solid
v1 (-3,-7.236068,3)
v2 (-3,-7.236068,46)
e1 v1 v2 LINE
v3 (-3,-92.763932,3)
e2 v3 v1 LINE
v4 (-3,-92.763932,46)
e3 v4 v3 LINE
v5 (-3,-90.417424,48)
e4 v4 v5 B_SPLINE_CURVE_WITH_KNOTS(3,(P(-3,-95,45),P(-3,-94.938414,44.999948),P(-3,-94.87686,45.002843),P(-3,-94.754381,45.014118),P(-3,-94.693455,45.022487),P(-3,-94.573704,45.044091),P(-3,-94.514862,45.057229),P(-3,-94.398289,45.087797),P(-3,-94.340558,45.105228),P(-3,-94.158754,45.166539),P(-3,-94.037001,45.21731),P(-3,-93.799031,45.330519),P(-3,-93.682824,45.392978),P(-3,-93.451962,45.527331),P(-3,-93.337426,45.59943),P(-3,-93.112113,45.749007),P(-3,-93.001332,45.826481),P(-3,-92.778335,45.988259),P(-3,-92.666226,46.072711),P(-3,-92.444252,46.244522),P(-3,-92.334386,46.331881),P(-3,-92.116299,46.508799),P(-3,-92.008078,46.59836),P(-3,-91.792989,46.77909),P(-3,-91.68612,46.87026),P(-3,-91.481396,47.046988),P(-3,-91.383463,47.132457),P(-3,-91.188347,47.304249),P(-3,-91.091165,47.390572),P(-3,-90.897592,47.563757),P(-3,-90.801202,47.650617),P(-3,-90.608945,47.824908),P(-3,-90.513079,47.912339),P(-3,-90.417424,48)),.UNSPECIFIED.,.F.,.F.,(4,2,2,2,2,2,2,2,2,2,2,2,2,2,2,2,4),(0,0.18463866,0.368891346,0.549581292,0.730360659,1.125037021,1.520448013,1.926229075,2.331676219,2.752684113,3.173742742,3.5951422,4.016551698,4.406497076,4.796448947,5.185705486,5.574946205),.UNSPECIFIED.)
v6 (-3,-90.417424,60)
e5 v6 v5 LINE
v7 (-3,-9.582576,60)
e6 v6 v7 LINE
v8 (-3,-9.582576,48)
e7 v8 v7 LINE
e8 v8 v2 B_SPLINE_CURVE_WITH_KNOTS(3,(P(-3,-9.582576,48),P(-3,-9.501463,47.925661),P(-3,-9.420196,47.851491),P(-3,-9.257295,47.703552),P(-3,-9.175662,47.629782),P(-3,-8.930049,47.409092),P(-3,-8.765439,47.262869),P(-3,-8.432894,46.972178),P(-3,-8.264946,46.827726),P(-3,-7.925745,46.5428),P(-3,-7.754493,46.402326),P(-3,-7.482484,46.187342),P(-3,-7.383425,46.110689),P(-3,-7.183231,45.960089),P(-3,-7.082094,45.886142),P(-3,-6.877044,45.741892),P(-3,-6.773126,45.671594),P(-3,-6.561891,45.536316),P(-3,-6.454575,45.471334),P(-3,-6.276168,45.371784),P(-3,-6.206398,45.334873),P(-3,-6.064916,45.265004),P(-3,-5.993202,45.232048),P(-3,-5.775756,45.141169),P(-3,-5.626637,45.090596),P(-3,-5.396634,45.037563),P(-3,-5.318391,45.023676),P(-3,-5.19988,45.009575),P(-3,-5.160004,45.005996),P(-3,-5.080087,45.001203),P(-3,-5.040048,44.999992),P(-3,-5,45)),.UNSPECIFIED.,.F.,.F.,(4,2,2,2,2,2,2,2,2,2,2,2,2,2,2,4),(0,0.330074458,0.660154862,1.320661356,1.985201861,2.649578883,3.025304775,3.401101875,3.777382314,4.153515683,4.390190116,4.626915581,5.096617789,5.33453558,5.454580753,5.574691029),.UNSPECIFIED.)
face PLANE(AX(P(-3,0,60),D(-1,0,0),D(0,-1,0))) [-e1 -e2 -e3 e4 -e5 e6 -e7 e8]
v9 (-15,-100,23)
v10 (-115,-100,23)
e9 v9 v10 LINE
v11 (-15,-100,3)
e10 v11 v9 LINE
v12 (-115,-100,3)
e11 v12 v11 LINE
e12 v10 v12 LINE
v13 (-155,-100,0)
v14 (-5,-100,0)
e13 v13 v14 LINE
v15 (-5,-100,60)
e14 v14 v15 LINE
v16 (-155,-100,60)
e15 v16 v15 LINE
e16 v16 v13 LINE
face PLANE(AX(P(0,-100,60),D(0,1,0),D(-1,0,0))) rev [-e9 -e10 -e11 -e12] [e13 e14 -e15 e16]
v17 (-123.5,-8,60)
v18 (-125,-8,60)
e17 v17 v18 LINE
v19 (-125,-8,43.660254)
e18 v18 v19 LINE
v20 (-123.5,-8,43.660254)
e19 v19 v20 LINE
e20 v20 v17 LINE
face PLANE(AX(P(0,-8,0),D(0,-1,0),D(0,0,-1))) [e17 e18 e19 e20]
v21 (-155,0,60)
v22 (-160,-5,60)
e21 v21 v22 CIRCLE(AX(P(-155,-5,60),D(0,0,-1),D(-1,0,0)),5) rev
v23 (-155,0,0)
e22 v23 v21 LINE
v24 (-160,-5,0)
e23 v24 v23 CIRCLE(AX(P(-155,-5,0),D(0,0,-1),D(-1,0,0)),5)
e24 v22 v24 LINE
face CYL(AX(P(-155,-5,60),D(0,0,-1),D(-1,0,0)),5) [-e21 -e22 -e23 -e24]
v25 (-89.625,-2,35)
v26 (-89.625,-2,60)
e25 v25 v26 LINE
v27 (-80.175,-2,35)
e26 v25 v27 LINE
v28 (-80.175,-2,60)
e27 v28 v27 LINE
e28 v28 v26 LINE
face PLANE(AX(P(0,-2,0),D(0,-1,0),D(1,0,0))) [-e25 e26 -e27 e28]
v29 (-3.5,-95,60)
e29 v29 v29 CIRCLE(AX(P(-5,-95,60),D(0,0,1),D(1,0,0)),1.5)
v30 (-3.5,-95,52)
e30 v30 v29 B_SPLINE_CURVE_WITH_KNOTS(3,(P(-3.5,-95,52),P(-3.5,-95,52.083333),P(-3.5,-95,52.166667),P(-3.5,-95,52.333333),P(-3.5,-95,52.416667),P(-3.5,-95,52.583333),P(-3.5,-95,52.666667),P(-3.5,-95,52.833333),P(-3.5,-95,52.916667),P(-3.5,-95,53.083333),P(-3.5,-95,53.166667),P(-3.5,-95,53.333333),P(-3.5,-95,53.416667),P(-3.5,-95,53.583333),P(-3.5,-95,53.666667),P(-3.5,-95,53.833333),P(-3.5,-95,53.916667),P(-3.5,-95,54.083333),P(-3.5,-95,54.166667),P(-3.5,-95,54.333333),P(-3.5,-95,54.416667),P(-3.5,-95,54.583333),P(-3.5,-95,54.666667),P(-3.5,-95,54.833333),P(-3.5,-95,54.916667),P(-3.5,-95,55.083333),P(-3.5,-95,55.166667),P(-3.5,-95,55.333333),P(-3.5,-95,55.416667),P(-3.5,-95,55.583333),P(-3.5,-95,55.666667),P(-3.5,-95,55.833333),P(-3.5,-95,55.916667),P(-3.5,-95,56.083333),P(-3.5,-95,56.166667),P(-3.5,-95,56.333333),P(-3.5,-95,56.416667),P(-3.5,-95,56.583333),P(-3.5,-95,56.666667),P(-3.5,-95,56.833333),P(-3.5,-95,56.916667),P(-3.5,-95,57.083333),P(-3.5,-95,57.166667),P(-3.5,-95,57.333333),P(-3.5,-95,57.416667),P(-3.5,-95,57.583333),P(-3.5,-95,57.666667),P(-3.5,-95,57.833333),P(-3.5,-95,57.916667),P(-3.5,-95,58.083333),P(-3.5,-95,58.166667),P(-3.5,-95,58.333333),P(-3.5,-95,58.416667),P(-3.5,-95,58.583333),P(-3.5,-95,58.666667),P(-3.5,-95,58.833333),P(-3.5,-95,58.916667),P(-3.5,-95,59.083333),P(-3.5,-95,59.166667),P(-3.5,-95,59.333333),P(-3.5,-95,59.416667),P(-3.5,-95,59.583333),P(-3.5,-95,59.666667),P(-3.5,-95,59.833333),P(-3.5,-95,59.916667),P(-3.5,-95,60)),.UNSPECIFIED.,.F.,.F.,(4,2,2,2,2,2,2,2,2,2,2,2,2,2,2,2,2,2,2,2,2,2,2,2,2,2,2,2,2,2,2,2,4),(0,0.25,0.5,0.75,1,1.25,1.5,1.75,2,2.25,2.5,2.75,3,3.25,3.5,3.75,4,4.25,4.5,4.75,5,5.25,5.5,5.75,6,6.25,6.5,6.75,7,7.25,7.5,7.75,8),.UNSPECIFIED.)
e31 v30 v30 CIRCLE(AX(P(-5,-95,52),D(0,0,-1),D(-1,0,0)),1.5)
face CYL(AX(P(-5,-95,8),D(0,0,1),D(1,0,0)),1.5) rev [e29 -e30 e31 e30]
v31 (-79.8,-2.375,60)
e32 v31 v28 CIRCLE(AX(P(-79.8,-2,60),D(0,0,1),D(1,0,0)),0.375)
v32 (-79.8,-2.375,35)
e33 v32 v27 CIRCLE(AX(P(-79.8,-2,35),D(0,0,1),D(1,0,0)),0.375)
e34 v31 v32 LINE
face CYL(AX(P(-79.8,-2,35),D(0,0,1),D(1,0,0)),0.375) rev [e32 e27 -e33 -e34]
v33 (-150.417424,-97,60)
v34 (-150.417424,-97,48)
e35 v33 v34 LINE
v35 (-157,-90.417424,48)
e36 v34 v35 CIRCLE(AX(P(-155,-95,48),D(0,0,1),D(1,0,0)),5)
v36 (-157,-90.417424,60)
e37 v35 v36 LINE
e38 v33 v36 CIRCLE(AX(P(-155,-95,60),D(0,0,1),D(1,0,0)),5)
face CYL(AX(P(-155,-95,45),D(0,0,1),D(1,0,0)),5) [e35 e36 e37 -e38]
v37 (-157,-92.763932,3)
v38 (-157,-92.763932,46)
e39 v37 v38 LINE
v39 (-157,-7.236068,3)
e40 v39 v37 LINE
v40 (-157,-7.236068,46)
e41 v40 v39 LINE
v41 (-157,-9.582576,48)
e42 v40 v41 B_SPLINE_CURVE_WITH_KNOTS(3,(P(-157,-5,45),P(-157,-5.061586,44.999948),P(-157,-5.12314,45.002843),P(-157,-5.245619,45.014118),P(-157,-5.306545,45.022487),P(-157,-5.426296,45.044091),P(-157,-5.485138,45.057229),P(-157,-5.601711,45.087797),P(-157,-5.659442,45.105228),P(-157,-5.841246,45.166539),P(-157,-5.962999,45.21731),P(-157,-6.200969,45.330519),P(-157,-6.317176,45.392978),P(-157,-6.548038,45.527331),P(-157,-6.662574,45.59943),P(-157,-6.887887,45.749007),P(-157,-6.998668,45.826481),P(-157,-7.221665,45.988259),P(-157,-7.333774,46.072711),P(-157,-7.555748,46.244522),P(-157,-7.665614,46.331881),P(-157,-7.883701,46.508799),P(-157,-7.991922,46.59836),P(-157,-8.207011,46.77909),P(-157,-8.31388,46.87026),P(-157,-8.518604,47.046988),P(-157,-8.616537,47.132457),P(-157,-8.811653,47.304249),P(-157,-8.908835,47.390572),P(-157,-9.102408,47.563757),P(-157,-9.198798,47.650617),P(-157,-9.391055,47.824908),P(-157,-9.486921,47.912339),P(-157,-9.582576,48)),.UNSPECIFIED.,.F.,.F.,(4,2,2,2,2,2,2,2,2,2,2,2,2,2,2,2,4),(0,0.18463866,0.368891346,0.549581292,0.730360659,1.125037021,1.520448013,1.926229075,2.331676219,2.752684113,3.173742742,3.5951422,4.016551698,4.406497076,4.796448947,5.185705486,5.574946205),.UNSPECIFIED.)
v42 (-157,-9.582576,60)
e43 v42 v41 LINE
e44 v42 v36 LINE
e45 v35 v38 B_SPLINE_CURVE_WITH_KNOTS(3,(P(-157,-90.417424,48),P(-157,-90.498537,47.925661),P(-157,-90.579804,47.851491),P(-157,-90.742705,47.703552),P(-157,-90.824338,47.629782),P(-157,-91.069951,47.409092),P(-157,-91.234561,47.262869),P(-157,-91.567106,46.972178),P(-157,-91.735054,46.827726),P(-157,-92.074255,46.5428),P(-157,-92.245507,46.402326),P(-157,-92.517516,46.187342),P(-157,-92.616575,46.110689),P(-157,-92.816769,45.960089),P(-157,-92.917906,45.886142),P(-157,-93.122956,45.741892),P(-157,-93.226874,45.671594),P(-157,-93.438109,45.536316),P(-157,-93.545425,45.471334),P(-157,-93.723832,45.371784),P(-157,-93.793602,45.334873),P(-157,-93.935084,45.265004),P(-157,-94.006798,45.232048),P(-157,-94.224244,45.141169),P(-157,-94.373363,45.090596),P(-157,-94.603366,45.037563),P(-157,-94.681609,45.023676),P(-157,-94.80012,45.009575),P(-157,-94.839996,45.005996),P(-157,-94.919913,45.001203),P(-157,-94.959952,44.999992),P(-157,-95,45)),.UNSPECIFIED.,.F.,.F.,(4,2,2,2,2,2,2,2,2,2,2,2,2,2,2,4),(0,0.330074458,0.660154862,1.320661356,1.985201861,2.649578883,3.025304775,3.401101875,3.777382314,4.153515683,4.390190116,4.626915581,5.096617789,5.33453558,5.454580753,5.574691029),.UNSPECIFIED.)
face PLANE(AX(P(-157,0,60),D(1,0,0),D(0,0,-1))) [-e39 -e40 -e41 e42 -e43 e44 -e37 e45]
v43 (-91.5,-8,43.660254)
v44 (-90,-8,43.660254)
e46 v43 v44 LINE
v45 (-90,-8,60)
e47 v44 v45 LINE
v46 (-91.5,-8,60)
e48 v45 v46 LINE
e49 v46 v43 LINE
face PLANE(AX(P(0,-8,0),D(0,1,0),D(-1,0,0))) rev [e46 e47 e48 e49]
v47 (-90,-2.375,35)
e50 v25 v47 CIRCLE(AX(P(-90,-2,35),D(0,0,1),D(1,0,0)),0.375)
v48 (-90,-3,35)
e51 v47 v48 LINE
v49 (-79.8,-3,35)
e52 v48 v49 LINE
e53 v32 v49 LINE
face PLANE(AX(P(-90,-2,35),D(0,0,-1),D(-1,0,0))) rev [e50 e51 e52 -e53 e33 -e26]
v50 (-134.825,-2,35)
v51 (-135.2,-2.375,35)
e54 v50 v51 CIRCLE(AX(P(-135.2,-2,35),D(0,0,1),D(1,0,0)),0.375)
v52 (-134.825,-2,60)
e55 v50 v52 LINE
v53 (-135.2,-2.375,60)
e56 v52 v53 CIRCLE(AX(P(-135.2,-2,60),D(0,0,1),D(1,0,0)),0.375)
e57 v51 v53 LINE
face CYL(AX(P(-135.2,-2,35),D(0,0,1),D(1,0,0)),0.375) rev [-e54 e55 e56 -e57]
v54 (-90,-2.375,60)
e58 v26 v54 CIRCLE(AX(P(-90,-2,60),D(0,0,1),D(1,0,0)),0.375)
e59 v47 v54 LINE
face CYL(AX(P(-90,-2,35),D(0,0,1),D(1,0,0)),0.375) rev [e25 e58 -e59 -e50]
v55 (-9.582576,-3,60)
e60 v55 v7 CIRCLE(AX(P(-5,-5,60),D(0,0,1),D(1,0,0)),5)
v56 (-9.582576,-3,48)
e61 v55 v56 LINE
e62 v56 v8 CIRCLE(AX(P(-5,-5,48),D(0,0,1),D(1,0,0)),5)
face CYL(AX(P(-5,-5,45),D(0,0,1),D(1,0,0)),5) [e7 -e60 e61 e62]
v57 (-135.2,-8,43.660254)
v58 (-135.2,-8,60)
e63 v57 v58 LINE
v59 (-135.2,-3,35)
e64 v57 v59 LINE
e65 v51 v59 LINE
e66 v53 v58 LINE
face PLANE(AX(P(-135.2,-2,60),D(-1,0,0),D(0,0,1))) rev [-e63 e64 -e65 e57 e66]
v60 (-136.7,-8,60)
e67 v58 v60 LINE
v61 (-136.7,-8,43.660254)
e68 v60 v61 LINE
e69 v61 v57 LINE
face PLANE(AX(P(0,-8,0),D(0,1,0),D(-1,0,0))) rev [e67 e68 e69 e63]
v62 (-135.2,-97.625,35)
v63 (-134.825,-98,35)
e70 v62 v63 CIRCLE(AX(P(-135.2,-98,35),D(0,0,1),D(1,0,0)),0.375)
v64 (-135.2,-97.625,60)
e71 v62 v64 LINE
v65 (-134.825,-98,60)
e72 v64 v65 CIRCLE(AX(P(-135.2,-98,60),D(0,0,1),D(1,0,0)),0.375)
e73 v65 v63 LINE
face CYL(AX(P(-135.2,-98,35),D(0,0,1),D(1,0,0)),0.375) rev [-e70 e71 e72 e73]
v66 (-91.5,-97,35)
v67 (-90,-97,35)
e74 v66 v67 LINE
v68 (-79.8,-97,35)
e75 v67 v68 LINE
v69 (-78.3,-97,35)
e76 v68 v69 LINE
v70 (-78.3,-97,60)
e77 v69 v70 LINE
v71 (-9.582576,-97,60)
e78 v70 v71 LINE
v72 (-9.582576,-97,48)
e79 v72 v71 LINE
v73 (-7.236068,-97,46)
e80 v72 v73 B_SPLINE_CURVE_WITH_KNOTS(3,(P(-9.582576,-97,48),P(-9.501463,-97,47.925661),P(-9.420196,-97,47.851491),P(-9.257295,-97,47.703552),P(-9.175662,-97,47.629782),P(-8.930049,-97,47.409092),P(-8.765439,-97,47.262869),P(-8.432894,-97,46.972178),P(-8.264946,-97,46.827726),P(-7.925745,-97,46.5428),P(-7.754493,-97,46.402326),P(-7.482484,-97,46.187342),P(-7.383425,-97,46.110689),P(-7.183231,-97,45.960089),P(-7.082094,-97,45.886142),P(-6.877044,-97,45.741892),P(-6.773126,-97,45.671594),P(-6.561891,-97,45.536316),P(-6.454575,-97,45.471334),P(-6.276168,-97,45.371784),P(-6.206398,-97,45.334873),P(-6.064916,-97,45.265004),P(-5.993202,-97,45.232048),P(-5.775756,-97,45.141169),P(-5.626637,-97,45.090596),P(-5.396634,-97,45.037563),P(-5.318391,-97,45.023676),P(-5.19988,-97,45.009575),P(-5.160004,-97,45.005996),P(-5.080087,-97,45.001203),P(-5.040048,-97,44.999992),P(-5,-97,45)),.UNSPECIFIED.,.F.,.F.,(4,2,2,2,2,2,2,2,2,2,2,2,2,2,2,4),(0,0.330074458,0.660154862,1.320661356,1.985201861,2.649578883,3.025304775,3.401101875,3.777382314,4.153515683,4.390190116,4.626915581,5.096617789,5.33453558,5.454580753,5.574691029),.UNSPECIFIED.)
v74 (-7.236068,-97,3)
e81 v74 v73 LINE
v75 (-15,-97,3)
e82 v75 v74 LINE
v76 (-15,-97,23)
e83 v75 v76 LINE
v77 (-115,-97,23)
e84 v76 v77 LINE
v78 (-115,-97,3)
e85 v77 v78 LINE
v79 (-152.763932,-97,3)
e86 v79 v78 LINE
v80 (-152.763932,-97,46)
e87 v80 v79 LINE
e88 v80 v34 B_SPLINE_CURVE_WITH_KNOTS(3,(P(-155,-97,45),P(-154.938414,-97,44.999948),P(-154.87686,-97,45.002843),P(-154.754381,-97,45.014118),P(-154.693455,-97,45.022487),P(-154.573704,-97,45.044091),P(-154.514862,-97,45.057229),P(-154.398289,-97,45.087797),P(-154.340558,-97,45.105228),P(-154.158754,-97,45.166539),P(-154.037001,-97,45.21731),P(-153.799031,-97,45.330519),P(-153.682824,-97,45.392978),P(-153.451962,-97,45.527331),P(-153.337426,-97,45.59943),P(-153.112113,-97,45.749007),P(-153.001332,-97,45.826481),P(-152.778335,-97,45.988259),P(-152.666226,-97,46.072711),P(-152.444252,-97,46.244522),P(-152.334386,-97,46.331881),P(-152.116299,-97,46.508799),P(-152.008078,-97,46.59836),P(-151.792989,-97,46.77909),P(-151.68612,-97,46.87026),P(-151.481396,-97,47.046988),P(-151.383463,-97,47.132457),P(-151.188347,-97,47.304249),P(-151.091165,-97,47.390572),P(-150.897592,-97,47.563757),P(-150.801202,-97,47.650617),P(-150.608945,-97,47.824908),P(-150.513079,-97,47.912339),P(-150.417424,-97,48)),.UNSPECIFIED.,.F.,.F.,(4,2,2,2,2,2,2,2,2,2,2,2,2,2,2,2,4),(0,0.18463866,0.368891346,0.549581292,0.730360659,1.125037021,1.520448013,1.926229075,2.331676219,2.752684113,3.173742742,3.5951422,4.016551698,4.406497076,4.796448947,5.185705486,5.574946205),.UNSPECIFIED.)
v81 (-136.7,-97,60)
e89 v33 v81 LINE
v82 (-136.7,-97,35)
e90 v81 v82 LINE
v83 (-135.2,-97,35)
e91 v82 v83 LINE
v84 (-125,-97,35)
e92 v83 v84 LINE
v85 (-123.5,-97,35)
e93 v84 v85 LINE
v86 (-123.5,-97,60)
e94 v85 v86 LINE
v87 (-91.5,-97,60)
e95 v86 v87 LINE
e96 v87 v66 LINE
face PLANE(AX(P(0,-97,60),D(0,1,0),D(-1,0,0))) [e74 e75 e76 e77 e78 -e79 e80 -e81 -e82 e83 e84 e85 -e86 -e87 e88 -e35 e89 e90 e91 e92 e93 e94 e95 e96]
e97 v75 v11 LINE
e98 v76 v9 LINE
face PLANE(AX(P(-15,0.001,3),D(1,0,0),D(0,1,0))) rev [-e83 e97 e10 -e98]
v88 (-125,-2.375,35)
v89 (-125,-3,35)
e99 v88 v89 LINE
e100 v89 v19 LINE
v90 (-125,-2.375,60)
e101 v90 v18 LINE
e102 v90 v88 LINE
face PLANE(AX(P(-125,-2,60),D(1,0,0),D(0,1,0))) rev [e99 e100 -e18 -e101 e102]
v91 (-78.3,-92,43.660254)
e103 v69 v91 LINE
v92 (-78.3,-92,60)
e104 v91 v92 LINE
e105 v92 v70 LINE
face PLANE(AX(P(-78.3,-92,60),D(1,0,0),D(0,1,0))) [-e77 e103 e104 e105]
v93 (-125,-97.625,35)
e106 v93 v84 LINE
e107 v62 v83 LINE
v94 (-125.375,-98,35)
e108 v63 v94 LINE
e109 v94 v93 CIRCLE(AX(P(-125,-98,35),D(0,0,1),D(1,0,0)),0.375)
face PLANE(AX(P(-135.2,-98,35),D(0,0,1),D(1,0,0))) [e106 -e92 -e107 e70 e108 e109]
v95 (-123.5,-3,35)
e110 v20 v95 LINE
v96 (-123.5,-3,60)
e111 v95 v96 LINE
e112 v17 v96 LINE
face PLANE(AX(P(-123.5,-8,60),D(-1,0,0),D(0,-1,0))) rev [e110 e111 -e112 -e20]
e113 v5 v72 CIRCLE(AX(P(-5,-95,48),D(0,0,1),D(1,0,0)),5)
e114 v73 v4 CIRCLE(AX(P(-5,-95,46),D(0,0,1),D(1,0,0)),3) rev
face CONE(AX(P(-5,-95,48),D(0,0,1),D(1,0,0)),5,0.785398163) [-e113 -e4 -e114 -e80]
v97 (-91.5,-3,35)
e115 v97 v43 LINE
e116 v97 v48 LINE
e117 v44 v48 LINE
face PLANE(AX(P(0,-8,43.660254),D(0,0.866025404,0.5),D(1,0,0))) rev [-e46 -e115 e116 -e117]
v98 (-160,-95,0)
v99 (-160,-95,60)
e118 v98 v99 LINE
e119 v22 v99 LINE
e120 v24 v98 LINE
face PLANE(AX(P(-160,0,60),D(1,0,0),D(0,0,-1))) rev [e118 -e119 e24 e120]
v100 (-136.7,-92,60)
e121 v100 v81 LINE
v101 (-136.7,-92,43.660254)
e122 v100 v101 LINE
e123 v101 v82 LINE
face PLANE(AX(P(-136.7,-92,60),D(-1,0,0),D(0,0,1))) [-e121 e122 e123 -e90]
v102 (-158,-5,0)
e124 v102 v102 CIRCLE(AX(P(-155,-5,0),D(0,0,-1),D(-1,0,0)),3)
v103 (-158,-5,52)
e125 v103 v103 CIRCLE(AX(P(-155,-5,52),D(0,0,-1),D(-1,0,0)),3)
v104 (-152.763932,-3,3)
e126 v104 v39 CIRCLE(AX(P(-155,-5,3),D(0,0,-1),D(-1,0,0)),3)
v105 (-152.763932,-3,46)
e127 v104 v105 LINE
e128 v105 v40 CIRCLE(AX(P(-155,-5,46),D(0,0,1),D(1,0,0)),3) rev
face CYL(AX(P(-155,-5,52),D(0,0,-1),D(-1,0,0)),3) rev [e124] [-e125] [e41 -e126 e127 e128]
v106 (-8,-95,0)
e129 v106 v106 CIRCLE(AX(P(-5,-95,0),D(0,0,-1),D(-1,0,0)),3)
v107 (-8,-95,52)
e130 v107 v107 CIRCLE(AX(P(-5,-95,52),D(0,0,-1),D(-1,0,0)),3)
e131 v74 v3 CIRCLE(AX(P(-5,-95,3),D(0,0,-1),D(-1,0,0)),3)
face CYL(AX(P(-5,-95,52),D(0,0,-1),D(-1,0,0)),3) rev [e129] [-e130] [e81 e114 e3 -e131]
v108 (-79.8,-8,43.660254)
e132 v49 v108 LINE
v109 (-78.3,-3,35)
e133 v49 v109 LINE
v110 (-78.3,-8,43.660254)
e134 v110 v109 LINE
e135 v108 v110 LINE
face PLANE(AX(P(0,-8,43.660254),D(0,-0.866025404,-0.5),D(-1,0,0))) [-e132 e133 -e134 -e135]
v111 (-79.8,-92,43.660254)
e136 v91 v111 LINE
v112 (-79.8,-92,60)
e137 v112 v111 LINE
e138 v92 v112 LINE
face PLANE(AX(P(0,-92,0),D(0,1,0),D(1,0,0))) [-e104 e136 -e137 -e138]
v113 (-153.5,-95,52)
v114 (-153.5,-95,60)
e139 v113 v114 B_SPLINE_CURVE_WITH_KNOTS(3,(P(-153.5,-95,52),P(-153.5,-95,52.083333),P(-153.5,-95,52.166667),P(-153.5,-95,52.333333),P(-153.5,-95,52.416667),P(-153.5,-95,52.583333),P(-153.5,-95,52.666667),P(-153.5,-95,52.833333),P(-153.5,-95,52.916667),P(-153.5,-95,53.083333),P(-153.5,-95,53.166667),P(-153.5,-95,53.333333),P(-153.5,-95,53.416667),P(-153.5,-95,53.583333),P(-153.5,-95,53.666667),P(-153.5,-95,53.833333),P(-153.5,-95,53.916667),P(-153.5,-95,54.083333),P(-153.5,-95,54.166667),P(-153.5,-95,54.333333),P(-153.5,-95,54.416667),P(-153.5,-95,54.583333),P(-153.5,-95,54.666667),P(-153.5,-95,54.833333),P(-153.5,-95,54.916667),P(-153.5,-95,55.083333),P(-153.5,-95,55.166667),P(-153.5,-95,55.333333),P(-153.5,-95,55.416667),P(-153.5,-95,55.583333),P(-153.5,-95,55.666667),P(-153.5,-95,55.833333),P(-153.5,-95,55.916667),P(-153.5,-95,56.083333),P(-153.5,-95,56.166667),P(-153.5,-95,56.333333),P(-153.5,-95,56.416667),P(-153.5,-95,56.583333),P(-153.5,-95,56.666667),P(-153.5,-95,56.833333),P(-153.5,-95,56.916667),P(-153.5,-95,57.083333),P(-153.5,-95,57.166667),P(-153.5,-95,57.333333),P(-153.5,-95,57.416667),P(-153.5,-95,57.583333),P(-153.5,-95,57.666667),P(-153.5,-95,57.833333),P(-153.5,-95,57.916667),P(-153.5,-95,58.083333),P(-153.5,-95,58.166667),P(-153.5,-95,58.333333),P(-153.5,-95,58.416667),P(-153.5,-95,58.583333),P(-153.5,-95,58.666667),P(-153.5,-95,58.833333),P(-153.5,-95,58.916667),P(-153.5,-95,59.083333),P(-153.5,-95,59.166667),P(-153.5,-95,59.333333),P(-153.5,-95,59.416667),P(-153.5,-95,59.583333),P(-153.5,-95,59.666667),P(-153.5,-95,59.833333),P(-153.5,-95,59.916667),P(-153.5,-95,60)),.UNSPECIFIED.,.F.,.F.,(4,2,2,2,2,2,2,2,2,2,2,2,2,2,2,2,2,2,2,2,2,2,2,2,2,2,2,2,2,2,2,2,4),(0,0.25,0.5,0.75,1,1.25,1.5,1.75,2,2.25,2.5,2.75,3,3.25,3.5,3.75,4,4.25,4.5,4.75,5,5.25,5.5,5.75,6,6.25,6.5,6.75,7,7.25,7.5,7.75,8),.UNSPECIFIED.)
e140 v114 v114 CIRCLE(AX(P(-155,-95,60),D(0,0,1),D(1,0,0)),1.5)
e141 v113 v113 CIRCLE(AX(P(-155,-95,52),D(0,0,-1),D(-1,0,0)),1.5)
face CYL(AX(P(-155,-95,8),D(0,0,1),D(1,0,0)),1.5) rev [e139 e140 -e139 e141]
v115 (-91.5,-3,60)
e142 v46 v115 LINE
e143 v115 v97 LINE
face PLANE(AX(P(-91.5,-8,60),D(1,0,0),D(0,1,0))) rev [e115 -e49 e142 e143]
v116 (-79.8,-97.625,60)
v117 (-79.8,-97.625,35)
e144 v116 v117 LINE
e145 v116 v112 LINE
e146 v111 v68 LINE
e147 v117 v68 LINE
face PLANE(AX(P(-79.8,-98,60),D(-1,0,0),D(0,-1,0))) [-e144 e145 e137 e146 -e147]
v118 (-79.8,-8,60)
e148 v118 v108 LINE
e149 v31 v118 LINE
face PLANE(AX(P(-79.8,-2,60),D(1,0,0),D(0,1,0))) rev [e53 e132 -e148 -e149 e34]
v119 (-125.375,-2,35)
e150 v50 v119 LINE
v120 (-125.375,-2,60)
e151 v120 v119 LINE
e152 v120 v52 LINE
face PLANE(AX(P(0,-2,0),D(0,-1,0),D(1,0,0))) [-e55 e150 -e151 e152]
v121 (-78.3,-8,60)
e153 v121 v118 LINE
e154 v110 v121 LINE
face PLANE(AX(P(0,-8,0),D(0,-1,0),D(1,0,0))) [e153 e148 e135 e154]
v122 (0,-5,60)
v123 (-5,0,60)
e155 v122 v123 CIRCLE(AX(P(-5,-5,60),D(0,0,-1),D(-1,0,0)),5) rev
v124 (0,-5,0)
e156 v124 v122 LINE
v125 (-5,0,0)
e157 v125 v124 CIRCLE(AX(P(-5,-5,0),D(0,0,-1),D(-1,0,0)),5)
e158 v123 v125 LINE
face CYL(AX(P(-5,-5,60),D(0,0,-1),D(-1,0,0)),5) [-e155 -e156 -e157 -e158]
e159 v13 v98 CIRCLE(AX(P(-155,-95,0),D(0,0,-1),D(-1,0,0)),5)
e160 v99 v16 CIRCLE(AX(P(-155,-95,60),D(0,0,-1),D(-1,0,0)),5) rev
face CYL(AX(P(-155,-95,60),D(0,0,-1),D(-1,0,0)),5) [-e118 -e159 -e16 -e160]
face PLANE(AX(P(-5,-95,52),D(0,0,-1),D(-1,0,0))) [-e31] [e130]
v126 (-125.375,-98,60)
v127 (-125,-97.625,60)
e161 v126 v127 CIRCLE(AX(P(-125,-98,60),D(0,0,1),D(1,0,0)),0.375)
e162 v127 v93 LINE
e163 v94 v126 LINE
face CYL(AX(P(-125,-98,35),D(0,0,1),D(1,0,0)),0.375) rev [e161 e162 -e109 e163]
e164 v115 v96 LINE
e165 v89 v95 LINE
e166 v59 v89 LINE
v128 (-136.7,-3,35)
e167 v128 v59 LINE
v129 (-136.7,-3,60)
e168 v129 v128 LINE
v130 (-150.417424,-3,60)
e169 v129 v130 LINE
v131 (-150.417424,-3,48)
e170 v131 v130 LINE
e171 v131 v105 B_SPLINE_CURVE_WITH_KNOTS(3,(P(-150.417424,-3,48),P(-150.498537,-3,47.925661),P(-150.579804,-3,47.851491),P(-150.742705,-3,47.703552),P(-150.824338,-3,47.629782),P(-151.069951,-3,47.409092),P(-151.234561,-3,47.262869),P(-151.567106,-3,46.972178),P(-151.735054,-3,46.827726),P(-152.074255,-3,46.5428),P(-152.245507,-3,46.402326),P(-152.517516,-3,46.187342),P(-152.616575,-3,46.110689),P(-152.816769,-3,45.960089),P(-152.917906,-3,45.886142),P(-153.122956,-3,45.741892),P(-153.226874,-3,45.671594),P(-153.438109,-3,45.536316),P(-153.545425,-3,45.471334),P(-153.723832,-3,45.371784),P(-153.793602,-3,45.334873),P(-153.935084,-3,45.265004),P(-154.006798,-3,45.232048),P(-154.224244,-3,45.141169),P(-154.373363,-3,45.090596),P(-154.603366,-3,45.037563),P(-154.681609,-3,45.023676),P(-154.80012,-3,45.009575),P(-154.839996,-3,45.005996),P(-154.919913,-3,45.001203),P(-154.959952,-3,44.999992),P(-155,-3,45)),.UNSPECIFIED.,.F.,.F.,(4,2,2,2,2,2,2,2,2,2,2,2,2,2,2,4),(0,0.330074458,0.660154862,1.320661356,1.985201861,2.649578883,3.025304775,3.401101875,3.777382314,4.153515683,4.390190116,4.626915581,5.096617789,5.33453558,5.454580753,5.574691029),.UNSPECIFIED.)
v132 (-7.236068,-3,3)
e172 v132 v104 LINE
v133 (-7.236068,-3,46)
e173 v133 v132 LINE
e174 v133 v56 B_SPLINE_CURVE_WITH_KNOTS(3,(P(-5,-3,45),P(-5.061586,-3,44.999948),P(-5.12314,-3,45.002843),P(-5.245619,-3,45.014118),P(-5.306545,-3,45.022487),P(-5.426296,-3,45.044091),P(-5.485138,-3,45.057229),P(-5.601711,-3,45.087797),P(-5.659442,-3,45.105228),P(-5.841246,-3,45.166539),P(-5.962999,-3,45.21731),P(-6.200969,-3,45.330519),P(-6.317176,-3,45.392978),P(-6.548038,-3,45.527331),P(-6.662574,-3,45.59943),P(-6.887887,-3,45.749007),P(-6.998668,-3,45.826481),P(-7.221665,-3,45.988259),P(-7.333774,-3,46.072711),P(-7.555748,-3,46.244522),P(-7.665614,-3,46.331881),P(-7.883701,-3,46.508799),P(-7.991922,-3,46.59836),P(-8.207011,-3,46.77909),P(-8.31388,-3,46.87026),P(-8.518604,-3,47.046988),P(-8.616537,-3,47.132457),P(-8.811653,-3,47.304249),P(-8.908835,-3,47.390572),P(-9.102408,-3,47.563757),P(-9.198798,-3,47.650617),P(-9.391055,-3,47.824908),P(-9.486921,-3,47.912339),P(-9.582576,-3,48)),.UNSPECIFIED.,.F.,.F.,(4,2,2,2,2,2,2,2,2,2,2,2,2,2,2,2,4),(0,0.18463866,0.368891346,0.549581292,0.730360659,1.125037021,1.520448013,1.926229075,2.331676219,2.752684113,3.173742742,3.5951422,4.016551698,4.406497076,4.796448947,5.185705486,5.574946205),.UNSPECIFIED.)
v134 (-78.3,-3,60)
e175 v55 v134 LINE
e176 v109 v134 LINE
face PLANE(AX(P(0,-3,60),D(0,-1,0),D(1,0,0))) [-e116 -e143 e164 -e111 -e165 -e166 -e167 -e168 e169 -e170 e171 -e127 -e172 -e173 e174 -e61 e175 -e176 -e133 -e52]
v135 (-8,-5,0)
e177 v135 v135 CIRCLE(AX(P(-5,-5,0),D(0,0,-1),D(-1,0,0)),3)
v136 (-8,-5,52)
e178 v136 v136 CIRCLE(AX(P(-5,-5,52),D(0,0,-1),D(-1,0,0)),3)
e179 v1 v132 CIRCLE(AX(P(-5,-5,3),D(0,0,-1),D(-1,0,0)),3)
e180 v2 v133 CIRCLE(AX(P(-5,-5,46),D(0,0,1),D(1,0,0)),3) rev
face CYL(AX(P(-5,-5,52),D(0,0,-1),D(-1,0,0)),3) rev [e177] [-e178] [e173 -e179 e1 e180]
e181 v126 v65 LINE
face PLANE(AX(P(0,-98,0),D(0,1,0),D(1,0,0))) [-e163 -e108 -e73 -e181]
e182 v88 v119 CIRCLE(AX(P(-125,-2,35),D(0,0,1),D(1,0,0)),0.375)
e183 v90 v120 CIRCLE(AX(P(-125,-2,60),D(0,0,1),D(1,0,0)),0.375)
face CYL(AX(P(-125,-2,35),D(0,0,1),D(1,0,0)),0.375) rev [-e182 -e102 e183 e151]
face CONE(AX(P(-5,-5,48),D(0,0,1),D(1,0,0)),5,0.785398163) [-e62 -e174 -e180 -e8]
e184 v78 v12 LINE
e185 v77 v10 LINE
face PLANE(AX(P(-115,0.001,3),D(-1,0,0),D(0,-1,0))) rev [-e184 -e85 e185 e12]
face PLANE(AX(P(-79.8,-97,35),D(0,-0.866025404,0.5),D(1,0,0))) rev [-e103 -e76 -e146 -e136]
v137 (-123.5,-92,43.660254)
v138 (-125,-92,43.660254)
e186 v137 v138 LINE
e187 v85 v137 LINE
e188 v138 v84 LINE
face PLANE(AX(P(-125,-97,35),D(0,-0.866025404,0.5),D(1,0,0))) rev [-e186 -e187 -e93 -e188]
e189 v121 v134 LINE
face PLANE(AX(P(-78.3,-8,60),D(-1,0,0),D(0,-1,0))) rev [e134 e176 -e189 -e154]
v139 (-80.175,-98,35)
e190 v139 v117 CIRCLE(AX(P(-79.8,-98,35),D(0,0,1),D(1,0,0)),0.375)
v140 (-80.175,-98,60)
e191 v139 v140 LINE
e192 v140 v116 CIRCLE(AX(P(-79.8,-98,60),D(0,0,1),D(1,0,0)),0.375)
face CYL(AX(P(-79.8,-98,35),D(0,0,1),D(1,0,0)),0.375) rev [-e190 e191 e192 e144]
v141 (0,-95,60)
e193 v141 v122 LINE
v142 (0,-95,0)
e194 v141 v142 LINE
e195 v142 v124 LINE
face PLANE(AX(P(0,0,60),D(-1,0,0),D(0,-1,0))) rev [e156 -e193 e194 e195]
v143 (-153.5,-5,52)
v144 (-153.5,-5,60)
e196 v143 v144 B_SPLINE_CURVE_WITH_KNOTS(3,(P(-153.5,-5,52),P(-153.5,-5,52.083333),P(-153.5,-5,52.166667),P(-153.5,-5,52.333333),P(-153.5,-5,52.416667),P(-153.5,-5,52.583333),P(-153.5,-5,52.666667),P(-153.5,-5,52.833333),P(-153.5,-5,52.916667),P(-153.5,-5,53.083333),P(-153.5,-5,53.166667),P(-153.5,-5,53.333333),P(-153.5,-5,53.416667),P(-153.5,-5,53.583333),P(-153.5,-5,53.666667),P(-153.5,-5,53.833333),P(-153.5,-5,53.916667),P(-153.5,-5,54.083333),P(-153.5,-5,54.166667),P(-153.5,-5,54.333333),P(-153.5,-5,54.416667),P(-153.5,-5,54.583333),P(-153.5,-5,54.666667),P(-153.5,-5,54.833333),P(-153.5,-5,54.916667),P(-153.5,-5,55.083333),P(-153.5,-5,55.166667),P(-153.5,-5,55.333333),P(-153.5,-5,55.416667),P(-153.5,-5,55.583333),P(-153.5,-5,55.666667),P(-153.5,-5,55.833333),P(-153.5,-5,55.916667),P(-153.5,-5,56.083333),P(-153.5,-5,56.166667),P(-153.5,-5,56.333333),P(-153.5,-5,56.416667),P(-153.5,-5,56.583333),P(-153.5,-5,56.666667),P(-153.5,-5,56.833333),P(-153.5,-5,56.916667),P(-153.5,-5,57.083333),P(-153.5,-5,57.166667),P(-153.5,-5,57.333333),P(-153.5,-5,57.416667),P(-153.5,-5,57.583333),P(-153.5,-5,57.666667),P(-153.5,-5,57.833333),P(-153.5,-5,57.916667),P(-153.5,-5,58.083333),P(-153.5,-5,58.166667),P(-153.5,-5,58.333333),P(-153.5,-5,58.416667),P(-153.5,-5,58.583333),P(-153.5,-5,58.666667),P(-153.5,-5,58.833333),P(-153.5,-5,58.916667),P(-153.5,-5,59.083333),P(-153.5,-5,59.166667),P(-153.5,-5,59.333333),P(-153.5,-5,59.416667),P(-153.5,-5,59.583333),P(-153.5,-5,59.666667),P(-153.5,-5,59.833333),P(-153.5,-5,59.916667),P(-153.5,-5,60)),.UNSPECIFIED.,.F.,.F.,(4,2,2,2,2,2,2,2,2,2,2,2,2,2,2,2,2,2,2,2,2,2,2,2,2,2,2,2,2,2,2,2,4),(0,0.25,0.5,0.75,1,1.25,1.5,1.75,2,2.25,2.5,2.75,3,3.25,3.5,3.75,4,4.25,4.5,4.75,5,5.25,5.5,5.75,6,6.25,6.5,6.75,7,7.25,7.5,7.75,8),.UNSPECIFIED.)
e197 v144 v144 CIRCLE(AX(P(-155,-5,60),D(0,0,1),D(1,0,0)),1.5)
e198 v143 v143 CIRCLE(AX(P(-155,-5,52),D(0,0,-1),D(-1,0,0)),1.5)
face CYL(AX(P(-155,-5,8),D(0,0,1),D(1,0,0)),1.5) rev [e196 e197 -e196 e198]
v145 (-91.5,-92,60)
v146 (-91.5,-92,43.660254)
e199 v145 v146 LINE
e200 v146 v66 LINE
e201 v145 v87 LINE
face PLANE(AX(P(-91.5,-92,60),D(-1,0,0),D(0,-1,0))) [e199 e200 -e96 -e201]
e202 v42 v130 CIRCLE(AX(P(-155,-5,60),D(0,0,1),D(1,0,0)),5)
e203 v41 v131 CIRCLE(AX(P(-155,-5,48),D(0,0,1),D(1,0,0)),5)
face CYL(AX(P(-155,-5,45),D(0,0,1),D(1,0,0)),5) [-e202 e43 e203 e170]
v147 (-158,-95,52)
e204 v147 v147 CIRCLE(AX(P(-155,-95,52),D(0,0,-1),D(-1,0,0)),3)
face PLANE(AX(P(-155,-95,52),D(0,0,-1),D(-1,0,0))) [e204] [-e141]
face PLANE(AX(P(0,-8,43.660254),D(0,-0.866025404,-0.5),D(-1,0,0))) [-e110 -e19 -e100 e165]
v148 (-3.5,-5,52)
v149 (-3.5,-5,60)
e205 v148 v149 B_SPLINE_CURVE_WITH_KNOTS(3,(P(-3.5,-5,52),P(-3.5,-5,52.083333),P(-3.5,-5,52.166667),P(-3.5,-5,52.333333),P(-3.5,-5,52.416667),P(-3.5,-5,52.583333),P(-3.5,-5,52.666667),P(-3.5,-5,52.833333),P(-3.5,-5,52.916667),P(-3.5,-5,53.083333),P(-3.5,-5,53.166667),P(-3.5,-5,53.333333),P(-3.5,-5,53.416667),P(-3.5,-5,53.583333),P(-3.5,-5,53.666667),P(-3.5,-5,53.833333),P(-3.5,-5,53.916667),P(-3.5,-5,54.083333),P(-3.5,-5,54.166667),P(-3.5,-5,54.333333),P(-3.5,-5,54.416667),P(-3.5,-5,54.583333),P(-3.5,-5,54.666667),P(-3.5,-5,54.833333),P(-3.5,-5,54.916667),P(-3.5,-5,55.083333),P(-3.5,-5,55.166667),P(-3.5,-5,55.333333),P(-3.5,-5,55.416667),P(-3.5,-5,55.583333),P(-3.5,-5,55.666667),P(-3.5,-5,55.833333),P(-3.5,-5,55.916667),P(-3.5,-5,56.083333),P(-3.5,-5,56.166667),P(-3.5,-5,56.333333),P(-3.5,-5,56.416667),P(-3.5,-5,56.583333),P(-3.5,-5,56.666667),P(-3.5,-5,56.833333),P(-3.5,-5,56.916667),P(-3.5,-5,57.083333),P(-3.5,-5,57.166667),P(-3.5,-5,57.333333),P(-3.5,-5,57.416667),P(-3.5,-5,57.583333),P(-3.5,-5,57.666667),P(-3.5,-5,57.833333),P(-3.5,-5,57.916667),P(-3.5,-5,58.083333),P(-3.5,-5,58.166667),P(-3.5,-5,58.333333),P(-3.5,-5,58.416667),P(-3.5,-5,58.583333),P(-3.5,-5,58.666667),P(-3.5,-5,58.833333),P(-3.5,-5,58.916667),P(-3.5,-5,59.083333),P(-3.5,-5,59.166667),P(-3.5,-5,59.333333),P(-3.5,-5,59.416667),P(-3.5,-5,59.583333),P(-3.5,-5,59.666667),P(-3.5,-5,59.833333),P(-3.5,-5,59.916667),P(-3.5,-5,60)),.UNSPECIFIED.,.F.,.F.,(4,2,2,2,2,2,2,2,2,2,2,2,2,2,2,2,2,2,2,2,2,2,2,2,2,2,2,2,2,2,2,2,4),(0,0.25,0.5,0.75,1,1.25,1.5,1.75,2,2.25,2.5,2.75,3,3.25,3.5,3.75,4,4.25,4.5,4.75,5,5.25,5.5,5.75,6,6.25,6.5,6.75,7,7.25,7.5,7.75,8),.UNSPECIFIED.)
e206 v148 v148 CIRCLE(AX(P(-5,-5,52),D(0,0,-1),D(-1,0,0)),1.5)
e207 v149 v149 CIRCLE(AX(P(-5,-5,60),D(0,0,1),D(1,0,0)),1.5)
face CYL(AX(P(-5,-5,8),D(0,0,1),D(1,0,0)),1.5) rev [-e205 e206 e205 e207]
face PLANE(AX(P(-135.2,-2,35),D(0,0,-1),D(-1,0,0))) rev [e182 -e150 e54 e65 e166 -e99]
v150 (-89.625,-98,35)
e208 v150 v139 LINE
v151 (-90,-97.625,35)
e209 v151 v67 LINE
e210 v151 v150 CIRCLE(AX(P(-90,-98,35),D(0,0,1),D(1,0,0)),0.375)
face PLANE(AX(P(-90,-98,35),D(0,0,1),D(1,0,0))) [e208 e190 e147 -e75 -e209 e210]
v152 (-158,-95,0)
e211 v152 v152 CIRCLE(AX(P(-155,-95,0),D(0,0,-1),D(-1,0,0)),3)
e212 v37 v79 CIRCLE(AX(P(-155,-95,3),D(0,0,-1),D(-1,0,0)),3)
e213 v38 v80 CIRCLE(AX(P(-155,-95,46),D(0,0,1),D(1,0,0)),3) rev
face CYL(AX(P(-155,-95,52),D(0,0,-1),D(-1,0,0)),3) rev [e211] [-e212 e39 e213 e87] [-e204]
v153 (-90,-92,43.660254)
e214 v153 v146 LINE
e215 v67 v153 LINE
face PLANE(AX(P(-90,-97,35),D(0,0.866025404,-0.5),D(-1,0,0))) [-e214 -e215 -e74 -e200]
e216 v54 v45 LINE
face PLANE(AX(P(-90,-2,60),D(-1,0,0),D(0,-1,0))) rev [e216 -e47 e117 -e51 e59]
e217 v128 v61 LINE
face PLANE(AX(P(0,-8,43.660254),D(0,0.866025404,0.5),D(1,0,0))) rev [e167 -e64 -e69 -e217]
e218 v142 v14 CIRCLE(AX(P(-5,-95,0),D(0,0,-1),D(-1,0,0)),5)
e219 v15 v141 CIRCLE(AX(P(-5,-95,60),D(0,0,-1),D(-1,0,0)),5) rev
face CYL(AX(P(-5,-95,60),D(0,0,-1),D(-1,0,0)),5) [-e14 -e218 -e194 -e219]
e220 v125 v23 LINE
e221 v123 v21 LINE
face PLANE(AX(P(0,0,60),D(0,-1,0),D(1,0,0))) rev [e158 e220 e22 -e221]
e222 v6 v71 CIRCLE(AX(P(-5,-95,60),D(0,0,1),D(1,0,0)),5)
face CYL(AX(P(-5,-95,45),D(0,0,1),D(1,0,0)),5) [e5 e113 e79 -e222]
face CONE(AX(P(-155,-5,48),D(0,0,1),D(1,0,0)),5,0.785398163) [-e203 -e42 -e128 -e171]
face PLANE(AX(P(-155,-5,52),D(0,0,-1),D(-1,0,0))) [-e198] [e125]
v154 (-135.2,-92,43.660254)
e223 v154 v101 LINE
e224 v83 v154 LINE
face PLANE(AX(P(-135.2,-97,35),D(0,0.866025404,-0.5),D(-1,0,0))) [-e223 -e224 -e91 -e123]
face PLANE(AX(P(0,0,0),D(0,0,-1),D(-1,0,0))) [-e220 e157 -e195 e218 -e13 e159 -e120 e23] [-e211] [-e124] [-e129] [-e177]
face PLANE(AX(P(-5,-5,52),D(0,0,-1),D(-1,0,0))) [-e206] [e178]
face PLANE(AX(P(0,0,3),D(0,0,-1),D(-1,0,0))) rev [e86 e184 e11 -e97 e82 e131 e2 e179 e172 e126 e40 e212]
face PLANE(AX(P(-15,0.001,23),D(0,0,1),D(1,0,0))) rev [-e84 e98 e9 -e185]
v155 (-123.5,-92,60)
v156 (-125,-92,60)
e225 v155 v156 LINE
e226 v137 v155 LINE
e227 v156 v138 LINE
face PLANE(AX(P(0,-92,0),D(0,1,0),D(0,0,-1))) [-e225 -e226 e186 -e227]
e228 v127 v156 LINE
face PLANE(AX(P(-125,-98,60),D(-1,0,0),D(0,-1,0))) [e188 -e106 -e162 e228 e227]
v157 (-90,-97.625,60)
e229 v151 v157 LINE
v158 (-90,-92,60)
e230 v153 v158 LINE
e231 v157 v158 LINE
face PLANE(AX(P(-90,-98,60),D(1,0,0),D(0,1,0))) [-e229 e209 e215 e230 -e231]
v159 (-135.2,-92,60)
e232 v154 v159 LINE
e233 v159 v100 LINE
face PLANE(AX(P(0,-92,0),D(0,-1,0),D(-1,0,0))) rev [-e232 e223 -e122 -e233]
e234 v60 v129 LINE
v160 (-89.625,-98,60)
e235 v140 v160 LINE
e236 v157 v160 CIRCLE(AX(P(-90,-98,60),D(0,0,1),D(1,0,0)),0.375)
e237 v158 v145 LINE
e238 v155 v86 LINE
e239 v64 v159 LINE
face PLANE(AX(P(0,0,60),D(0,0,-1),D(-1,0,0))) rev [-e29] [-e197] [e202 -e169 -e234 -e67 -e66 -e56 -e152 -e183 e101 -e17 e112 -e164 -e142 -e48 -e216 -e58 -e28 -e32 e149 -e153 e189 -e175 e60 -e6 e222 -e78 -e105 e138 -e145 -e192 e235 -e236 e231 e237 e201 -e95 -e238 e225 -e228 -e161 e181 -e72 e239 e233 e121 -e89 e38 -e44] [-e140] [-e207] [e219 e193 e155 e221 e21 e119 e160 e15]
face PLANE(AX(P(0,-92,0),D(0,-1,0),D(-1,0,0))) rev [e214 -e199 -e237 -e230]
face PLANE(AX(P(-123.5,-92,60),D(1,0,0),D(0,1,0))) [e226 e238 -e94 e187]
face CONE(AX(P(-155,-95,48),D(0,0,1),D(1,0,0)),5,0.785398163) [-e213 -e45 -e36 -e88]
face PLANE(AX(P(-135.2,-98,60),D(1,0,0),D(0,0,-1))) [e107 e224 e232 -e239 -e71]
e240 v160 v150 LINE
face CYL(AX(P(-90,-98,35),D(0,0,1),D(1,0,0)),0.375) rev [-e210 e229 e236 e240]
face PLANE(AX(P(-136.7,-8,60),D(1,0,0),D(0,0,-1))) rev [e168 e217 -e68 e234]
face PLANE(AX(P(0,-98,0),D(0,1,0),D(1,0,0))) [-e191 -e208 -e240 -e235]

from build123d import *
from OCP.BRepFilletAPI import BRepFilletAPI_MakeChamfer

# Parameters (mm, degrees)
BASESHAPE_W                = 160
BASESHAPE_H                = 100
CONTAINERBASE_DEPTH        = 60
SIDECORNERFILLET_R         = 5
CONTAINERSHELL_T           = -3
SLOTSKETCH_W               = 10.2
SLOTSKETCH_H               = 25
SLOTCUT_DEPTH              = 1
VIEWELECTRONICSHOLE_REACH  = 199.99
ELECTRONICSVIEWHOLE_W      = 100
ELECTRONICSVIEWHOLE_H      = 20
SCREWSUPPORTS_R            = 5
BOSS_EXTRUDE3_DEPTH        = 15
SCREWSUPPORTTAPER_SIZE     = 3
SKETCH5_R                  = 3
COUNTERSINKCUT_DEPTH       = 52
SKETCH6_R                  = 1.5
SCREWHOLES_DEPTH           = 52
SKETCH7_W                  = 1.5
SKETCH7_H                  = 25
BOSS_EXTRUDE4_DEPTH        = 5
CHAMFER1_SIZE              = 8.660254038
CHAMFER1_SIZE_2            = 5
CHAMFER1_OF_MIRROR3_SIZE   = 5
CHAMFER1_OF_MIRROR3_SIZE_2 = 8.660254038
SKETCH8_R                  = 0.375
CUT_EXTRUDE1_DEPTH         = 25


with BuildPart() as part:
    # BaseShape → ContainerBase (new body)
    with BuildSketch(Plane.XY):
        with Locations((-80, -50)):
            Rectangle(BASESHAPE_W, BASESHAPE_H)
    extrude(amount=CONTAINERBASE_DEPTH)

    # SideCornerFillet
    sidecornerfillet_edges = [part.edges().sort_by_distance(p)[0] for p in [
        (0, -100, 30),
        (-160, -100, 30),
        (-160, 0, 30),
        (0, 0, 30),
    ]]
    fillet(sidecornerfillet_edges, radius=SIDECORNERFILLET_R)

    # ContainerShell
    containershell_openings = [part.faces().sort_by_distance(p)[0] for p in [
        (-80, -50, 60),
    ]]
    offset(amount=CONTAINERSHELL_T, openings=containershell_openings, kind=Kind.INTERSECTION)

    # SlotSketch → SlotCut (cut)
    with BuildSketch(Plane.XZ.offset(3)):
        with Locations((-130.1, 47.5)):
            Rectangle(SLOTSKETCH_W, SLOTSKETCH_H)
        with Locations((-84.9, 47.5)):
            Rectangle(SLOTSKETCH_W, SLOTSKETCH_H)
    slotcut = extrude(amount=-SLOTCUT_DEPTH, mode=Mode.SUBTRACT)

    # MirrorSlots: SlotCut across plane
    add(slotcut.mirror(Plane(origin=(0, -50, 0), x_dir=(0, 0, 1), z_dir=(0, -1, 0))), mode=Mode.SUBTRACT)

    # ElectronicsViewHole → ViewElectronicsHole (cut, up to next)
    with BuildSketch(Plane.XZ.offset(100), mode=Mode.PRIVATE) as viewelectronicshole_sk1:
        with Locations((-65, 13)):
            Rectangle(ELECTRONICSVIEWHOLE_W, ELECTRONICSVIEWHOLE_H)
    viewelectronicshole_tool1 = extrude(viewelectronicshole_sk1.sketch, amount=-VIEWELECTRONICSHOLE_REACH, mode=Mode.PRIVATE) & part.part
    add(viewelectronicshole_tool1.solids().sort_by_distance((-65, -100, 13))[0], mode=Mode.SUBTRACT)

    # ScrewSupports → Boss-Extrude3 (add)
    with BuildSketch(Plane.XY.offset(60)):
        with Locations((-155, -5)):
            Circle(SCREWSUPPORTS_R)
        with Locations((-155, -95)):
            Circle(SCREWSUPPORTS_R)
        with Locations((-5, -95)):
            Circle(SCREWSUPPORTS_R)
        with Locations((-5, -5)):
            Circle(SCREWSUPPORTS_R)
    extrude(amount=-BOSS_EXTRUDE3_DEPTH)

    # ScrewSupportTaper
    screwsupporttaper_edges = [part.edges().sort_by_distance(p)[0] for p in [
        (-151.464466094, -8.535533906, 45),
        (-8.535533906, -91.464466094, 45),
        (-8.535533906, -8.535533906, 45),
        (-151.464466094, -91.464466094, 45),
    ]]
    chamfer(screwsupporttaper_edges, length=SCREWSUPPORTTAPER_SIZE)

    # Sketch5 → CounterSinkCut (cut)
    with BuildSketch(Plane(origin=(0, 0, 0), x_dir=(-1, 0, 0), z_dir=(0, 0, -1))):
        with Locations((5, -5)):
            Circle(SKETCH5_R)
        with Locations((5, -95)):
            Circle(SKETCH5_R)
        with Locations((155, -95)):
            Circle(SKETCH5_R)
        with Locations((155, -5)):
            Circle(SKETCH5_R)
    extrude(amount=-COUNTERSINKCUT_DEPTH, mode=Mode.SUBTRACT)

    # Sketch6 → ScrewHoles (cut)
    with BuildSketch(Plane.XY.offset(60)):
        with Locations((-155, -5)):
            Circle(SKETCH6_R)
        with Locations((-155, -95)):
            Circle(SKETCH6_R)
        with Locations((-5, -95)):
            Circle(SKETCH6_R)
        with Locations((-5, -5)):
            Circle(SKETCH6_R)
    extrude(amount=-SCREWHOLES_DEPTH, mode=Mode.SUBTRACT)

    # Sketch7 → Boss-Extrude4 (add)
    with BuildSketch(Plane.XZ.offset(3)):
        with Locations((-135.95, 47.5)):
            Rectangle(SKETCH7_W, SKETCH7_H)
        with Locations((-124.25, 47.5)):
            Rectangle(SKETCH7_W, SKETCH7_H)
        with Locations((-90.75, 47.5)):
            Rectangle(SKETCH7_W, SKETCH7_H)
        with Locations((-79.05, 47.5)):
            Rectangle(SKETCH7_W, SKETCH7_H)
    boss_extrude4 = extrude(amount=BOSS_EXTRUDE4_DEPTH)

    # Chamfer1
    chamfer1_edges_1 = [part.edges().sort_by_distance(p)[0] for p in [
        (-135.95, -8, 35),
    ]]
    chamfer1_side_1 = [part.faces().sort_by_distance(p)[0] for p in [
        (-135.95, -8, 35.1),
    ]]
    chamfer1_edges_2 = [part.edges().sort_by_distance(p)[0] for p in [
        (-124.25, -8, 35),
    ]]
    chamfer1_side_2 = [part.faces().sort_by_distance(p)[0] for p in [
        (-124.25, -8, 35.1),
    ]]
    chamfer1_edges_3 = [part.edges().sort_by_distance(p)[0] for p in [
        (-79.05, -8, 35),
    ]]
    chamfer1_side_3 = [part.faces().sort_by_distance(p)[0] for p in [
        (-79.05, -8, 35.1),
    ]]
    chamfer1_edges_4 = [part.edges().sort_by_distance(p)[0] for p in [
        (-90.75, -8, 35),
    ]]
    chamfer1_side_4 = [part.faces().sort_by_distance(p)[0] for p in [
        (-90.75, -8, 35.1),
    ]]
    chamfer1 = BRepFilletAPI_MakeChamfer(part.part.solid().wrapped)
    for e in chamfer1_edges_1:
        chamfer1.Add(CHAMFER1_SIZE - 0.0001, CHAMFER1_SIZE_2 - 0.0001, e.wrapped, chamfer1_side_1[0].wrapped)
    for e in chamfer1_edges_2:
        chamfer1.Add(CHAMFER1_SIZE - 0.0001, CHAMFER1_SIZE_2 - 0.0001, e.wrapped, chamfer1_side_2[0].wrapped)
    for e in chamfer1_edges_3:
        chamfer1.Add(CHAMFER1_SIZE - 0.0001, CHAMFER1_SIZE_2 - 0.0001, e.wrapped, chamfer1_side_3[0].wrapped)
    for e in chamfer1_edges_4:
        chamfer1.Add(CHAMFER1_SIZE - 0.0001, CHAMFER1_SIZE_2 - 0.0001, e.wrapped, chamfer1_side_4[0].wrapped)
    add(Compound.cast(chamfer1.Shape()), mode=Mode.REPLACE)  # a hair under: the kernel refuses the full size

    # Mirror3: Boss-Extrude4 across plane
    add(boss_extrude4.mirror(Plane.ZX.offset(-50)))

    # Chamfer1 of Mirror3
    chamfer1_of_mirror3_edges_1 = [part.edges().sort_by_distance(p)[0] for p in [
        (-135.95, -92, 35),
    ]]
    chamfer1_of_mirror3_side_1 = [part.faces().sort_by_distance(p)[0] for p in [
        (-135.95, -92.1, 35),
    ]]
    chamfer1_of_mirror3_edges_2 = [part.edges().sort_by_distance(p)[0] for p in [
        (-124.25, -92, 35),
    ]]
    chamfer1_of_mirror3_side_2 = [part.faces().sort_by_distance(p)[0] for p in [
        (-124.25, -92.1, 35),
    ]]
    chamfer1_of_mirror3_edges_3 = [part.edges().sort_by_distance(p)[0] for p in [
        (-79.05, -92, 35),
    ]]
    chamfer1_of_mirror3_side_3 = [part.faces().sort_by_distance(p)[0] for p in [
        (-79.05, -92.1, 35),
    ]]
    chamfer1_of_mirror3_edges_4 = [part.edges().sort_by_distance(p)[0] for p in [
        (-90.75, -92, 35),
    ]]
    chamfer1_of_mirror3_side_4 = [part.faces().sort_by_distance(p)[0] for p in [
        (-90.75, -92.1, 35),
    ]]
    chamfer1_of_mirror3 = BRepFilletAPI_MakeChamfer(part.part.solid().wrapped)
    for e in chamfer1_of_mirror3_edges_1:
        chamfer1_of_mirror3.Add(CHAMFER1_OF_MIRROR3_SIZE - 0.0001, CHAMFER1_OF_MIRROR3_SIZE_2 - 0.0001, e.wrapped, chamfer1_of_mirror3_side_1[0].wrapped)
    for e in chamfer1_of_mirror3_edges_2:
        chamfer1_of_mirror3.Add(CHAMFER1_OF_MIRROR3_SIZE - 0.0001, CHAMFER1_OF_MIRROR3_SIZE_2 - 0.0001, e.wrapped, chamfer1_of_mirror3_side_2[0].wrapped)
    for e in chamfer1_of_mirror3_edges_3:
        chamfer1_of_mirror3.Add(CHAMFER1_OF_MIRROR3_SIZE - 0.0001, CHAMFER1_OF_MIRROR3_SIZE_2 - 0.0001, e.wrapped, chamfer1_of_mirror3_side_3[0].wrapped)
    for e in chamfer1_of_mirror3_edges_4:
        chamfer1_of_mirror3.Add(CHAMFER1_OF_MIRROR3_SIZE - 0.0001, CHAMFER1_OF_MIRROR3_SIZE_2 - 0.0001, e.wrapped, chamfer1_of_mirror3_side_4[0].wrapped)
    add(Compound.cast(chamfer1_of_mirror3.Shape()), mode=Mode.REPLACE)  # a hair under: the kernel refuses the full size

    # Sketch8 → Cut-Extrude1 (cut)
    with BuildSketch(Plane.XY.offset(60)):
        with Locations((-135.2, -2)):
            Circle(SKETCH8_R)
        with Locations((-125, -2)):
            Circle(SKETCH8_R)
        with Locations((-90, -2)):
            Circle(SKETCH8_R)
        with Locations((-79.8, -2)):
            Circle(SKETCH8_R)
        with Locations((-135.2, -98)):
            Circle(SKETCH8_R)
        with Locations((-90, -98)):
            Circle(SKETCH8_R)
        with Locations((-125, -98)):
            Circle(SKETCH8_R)
        with Locations((-79.8, -98)):
            Circle(SKETCH8_R)
    extrude(amount=-CUT_EXTRUDE1_DEPTH, mode=Mode.SUBTRACT)


solid = part.part
